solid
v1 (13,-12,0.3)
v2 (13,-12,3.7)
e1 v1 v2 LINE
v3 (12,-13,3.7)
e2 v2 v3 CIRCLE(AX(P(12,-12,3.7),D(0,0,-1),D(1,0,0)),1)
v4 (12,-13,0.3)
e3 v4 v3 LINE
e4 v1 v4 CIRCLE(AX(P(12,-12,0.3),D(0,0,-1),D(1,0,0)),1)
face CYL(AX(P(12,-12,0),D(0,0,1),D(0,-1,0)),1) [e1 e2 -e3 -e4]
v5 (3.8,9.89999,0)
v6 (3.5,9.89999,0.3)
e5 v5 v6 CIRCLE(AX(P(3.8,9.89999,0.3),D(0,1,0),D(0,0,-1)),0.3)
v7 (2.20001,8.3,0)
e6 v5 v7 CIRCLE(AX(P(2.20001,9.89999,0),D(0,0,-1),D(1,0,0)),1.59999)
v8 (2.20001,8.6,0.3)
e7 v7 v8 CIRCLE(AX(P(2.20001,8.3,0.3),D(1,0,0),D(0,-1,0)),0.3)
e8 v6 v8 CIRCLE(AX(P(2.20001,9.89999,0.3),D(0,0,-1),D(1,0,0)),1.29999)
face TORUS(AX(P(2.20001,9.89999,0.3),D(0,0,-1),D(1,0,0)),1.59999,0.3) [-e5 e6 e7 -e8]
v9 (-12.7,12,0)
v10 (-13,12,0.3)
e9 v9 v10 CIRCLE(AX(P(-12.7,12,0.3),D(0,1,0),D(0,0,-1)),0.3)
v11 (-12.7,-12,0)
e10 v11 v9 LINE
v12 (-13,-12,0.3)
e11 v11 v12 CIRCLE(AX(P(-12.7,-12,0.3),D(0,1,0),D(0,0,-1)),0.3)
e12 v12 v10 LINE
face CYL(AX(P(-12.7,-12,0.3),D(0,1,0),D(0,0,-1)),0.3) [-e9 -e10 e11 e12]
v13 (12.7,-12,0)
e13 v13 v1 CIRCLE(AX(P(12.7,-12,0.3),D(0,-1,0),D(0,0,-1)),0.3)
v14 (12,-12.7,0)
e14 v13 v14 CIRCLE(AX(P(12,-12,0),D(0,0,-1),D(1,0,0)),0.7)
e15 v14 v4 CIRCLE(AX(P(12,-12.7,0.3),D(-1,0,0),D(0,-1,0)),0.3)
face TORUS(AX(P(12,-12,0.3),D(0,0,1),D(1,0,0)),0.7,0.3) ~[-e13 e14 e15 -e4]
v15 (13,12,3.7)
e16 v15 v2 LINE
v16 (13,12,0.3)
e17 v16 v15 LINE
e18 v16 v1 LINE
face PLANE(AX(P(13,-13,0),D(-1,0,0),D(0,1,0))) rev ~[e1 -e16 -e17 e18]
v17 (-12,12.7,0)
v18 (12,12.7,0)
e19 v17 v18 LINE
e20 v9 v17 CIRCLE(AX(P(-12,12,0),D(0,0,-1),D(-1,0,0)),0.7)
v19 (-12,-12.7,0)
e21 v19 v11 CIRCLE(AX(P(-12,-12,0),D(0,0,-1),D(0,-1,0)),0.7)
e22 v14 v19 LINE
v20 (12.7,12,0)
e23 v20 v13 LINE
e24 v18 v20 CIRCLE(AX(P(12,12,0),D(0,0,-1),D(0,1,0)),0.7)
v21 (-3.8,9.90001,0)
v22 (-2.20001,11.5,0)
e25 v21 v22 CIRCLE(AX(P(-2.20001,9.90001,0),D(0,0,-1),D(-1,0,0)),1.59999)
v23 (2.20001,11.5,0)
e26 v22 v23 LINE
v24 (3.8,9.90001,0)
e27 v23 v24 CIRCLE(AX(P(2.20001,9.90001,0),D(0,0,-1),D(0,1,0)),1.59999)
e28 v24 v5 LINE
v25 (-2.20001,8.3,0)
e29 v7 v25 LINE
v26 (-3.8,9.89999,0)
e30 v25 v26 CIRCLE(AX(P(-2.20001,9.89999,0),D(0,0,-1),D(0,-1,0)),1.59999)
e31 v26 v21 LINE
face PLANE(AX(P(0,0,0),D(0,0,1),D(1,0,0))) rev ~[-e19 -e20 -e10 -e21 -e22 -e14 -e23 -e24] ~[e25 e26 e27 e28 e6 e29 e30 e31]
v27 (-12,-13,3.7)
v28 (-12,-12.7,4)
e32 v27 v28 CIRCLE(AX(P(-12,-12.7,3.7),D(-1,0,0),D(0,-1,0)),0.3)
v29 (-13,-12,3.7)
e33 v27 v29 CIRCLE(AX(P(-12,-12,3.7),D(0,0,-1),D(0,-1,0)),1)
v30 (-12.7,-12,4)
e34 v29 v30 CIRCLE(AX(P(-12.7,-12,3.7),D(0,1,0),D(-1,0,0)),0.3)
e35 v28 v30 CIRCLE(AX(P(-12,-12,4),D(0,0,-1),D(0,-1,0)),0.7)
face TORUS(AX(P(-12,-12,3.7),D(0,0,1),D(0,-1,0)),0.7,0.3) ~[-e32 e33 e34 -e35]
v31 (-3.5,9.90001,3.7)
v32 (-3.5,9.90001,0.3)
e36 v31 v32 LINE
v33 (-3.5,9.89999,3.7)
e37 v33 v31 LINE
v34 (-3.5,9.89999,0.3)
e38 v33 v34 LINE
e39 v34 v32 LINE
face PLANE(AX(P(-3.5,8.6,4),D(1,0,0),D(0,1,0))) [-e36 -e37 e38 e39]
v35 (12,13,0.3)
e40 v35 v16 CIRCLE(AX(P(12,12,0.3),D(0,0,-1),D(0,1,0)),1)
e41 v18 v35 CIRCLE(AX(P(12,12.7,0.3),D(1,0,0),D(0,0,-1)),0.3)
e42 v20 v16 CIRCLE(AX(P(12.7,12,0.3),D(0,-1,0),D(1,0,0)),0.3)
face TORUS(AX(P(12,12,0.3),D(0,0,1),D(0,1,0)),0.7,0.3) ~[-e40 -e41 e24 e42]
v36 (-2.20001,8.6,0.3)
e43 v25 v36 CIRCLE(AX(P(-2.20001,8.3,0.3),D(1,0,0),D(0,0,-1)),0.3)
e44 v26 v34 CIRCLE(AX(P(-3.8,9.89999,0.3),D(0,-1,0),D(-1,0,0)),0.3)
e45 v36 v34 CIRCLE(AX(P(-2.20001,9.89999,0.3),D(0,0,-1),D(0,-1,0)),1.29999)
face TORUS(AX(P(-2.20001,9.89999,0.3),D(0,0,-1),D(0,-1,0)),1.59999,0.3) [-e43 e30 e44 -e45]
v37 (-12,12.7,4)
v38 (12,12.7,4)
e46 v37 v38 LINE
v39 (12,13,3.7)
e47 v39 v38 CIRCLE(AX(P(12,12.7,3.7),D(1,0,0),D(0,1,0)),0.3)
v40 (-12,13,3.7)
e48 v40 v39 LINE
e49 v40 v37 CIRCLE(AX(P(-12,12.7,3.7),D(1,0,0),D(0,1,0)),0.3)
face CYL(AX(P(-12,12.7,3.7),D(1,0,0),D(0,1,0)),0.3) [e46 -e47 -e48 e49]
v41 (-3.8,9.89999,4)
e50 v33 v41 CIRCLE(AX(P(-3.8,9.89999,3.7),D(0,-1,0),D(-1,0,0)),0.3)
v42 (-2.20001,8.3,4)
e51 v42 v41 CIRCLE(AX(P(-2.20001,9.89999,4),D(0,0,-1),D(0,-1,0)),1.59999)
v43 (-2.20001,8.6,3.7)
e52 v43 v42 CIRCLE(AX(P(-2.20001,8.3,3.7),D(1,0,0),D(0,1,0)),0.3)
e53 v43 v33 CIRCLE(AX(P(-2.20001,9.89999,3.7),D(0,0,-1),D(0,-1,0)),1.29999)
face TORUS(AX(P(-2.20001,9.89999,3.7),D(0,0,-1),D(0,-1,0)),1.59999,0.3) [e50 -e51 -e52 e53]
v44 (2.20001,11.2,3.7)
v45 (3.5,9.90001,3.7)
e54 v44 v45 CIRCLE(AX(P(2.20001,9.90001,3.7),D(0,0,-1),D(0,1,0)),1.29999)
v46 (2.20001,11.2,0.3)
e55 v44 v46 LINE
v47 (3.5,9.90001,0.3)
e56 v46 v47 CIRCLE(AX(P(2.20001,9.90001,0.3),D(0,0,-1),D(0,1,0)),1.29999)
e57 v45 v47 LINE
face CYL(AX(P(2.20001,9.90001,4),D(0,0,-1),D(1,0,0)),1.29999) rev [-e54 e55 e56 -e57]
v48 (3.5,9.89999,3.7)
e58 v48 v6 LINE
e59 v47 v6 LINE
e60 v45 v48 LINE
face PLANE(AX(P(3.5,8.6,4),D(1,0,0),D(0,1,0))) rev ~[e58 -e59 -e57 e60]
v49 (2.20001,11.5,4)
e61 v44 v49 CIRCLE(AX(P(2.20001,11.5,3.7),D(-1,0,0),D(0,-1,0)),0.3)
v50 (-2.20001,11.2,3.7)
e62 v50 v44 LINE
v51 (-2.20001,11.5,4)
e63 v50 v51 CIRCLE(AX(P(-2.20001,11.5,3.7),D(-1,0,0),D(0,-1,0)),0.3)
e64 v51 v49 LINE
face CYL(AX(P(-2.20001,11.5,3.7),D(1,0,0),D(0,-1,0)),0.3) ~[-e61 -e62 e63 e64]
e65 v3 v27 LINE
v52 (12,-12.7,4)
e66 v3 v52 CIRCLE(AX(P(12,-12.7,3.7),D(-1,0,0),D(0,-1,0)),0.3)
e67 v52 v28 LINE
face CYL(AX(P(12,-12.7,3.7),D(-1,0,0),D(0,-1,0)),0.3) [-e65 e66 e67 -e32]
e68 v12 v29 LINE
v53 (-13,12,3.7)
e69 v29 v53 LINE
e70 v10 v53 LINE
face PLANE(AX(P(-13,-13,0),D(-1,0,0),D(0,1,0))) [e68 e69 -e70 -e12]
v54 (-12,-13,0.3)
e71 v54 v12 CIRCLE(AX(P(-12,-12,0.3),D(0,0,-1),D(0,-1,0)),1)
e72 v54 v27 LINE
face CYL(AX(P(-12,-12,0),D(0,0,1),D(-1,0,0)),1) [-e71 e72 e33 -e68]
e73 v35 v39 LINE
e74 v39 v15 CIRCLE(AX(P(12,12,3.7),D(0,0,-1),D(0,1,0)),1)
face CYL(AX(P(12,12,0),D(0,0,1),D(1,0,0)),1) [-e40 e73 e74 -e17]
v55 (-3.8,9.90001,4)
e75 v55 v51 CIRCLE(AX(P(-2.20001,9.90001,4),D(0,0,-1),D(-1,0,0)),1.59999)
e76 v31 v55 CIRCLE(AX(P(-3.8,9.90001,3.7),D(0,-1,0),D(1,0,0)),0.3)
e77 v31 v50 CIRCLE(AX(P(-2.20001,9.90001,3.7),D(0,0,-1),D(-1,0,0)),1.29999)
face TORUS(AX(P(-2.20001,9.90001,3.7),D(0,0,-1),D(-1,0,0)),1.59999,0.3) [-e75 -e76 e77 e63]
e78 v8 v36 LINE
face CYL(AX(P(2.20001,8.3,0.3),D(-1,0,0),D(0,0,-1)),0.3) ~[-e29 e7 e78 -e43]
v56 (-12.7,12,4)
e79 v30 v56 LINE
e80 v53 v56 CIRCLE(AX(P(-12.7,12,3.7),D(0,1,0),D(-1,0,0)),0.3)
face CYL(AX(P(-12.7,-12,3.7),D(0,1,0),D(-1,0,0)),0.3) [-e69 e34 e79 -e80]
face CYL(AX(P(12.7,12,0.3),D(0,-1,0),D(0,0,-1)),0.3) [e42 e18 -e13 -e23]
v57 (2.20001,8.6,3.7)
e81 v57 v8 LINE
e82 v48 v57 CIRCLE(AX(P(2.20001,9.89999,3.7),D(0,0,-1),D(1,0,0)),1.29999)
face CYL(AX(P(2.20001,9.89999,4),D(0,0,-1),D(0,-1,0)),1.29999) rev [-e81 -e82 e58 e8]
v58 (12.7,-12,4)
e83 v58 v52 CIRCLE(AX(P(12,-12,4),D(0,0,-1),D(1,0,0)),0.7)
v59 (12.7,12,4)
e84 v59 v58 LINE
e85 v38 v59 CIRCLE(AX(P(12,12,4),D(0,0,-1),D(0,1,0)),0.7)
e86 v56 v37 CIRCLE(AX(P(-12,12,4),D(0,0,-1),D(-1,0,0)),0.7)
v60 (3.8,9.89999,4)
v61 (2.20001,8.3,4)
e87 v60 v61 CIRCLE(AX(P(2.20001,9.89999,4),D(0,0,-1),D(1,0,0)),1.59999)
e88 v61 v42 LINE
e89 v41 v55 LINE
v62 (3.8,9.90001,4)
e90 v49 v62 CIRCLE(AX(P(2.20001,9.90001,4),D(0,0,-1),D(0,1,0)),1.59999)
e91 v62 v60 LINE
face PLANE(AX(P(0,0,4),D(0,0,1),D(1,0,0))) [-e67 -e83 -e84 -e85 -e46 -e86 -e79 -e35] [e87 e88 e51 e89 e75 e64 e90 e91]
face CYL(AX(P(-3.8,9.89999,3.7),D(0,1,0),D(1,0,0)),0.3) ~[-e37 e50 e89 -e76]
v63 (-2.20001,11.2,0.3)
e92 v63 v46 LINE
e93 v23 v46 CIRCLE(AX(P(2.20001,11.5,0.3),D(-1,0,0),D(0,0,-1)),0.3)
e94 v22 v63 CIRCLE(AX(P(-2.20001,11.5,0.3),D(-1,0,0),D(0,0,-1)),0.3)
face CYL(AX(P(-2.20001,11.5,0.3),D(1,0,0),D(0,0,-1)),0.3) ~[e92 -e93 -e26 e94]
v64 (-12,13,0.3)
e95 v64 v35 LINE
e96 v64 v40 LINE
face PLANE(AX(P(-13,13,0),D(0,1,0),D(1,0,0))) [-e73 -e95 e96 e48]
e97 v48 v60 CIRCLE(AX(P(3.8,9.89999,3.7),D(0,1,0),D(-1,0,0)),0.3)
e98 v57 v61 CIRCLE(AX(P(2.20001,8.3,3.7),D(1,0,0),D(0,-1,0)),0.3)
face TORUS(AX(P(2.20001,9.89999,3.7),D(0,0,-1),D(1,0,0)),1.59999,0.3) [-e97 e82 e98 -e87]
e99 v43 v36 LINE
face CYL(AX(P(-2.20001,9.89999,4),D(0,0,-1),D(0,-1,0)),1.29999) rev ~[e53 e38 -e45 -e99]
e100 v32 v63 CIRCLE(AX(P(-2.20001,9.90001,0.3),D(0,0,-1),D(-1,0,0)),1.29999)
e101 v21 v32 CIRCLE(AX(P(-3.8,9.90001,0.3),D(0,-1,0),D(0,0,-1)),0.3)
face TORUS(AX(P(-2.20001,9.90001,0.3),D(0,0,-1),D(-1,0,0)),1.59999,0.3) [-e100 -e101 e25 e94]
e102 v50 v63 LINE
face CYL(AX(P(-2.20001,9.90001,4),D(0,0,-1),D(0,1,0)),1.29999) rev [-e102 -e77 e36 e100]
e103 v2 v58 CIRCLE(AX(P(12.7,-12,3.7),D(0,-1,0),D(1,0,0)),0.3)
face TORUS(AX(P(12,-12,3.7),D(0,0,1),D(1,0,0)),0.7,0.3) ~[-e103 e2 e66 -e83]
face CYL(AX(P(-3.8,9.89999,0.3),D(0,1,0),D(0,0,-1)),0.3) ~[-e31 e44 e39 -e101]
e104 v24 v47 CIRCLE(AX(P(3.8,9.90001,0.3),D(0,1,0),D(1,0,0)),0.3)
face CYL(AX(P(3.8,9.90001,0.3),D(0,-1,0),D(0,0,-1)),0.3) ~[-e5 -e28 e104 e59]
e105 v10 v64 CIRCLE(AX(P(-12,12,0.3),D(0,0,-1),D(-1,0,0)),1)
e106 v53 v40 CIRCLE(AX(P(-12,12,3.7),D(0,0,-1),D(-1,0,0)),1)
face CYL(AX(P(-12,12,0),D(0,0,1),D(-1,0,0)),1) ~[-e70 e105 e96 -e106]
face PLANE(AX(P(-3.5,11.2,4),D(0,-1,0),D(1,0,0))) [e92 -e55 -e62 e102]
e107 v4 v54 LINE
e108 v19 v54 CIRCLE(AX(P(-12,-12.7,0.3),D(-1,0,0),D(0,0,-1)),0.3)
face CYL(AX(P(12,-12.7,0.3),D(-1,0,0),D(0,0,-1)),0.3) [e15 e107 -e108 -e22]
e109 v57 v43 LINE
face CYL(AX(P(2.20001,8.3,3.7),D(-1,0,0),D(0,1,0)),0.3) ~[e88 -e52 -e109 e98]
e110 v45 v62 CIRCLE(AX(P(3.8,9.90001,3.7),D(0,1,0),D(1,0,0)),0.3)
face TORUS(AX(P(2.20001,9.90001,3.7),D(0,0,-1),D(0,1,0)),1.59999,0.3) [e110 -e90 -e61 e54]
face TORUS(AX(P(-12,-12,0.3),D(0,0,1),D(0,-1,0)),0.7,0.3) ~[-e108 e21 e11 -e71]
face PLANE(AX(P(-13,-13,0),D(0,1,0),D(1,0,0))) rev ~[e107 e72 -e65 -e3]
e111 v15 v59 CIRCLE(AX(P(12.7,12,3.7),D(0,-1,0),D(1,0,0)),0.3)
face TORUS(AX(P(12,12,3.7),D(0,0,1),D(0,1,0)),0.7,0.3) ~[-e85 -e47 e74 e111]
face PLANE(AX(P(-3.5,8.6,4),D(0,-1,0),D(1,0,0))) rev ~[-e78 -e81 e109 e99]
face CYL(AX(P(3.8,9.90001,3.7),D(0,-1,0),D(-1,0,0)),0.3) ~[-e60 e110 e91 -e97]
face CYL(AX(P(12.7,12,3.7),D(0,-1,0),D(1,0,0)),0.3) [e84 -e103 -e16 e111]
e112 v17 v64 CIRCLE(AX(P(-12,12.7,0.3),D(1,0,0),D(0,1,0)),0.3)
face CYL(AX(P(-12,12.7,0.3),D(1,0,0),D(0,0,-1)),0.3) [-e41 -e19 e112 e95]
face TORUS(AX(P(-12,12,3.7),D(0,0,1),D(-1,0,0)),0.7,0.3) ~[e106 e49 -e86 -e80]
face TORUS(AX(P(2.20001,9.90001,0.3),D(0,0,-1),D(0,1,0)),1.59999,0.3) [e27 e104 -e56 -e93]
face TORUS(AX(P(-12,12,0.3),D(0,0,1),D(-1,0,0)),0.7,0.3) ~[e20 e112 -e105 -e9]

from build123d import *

# Parameters (mm, degrees)
F0_W     = 26
F0_H     = 26
F1_DEPTH = 4
F2_R     = 1
F4_W     = 7
F4_H     = 2.6
F5_DEPTH = 25
F6_R     = 1.29999
F7_R     = 0.3


# Not quite as in the source:
# - a fillet or chamfer is up to 0.001 mm smaller than in the source, because OpenCascade refuses the exact size


with BuildPart() as f1:
    # F0 (on Top) → F1 (new body)
    with BuildSketch(Plane.XY):
        Rectangle(F0_W, F0_H)
    extrude(amount=F1_DEPTH)

    # F2
    f2_edges = [f1.edges().sort_by_distance(p)[0] for p in [
        (-13, -13, 2),
        (-13, 13, 2),
        (13, -13, 2),
        (13, 13, 2),
    ]]
    fillet(f2_edges, radius=F2_R)

    # F4 (on face) → F5 (cut)
    with BuildSketch(Plane.XY.offset(4)):
        with Locations((0, 9.9)):
            Rectangle(F4_W, F4_H)
    extrude(amount=-F5_DEPTH, mode=Mode.SUBTRACT)

    # F6 (radius 1.3 in the source; OpenCascade refuses exactly that, so slightly less here)
    f6_edges = [f1.edges().sort_by_distance(p)[0] for p in [
        (-3.5, 11.2, 2),
        (3.5, 11.2, 2),
        (3.5, 8.6, 2),
        (-3.5, 8.6, 2),
    ]]
    fillet(f6_edges, radius=F6_R)

    # F7
    f7_edges = [f1.edges().sort_by_distance(p)[0] for p in [
        (-13, 0, 4),
        (-13, 0, 0),
        (0, 11.2, 4),
        (0, 11.2, 0),
    ]]
    fillet(f7_edges, radius=F7_R)


solid = f1.part
